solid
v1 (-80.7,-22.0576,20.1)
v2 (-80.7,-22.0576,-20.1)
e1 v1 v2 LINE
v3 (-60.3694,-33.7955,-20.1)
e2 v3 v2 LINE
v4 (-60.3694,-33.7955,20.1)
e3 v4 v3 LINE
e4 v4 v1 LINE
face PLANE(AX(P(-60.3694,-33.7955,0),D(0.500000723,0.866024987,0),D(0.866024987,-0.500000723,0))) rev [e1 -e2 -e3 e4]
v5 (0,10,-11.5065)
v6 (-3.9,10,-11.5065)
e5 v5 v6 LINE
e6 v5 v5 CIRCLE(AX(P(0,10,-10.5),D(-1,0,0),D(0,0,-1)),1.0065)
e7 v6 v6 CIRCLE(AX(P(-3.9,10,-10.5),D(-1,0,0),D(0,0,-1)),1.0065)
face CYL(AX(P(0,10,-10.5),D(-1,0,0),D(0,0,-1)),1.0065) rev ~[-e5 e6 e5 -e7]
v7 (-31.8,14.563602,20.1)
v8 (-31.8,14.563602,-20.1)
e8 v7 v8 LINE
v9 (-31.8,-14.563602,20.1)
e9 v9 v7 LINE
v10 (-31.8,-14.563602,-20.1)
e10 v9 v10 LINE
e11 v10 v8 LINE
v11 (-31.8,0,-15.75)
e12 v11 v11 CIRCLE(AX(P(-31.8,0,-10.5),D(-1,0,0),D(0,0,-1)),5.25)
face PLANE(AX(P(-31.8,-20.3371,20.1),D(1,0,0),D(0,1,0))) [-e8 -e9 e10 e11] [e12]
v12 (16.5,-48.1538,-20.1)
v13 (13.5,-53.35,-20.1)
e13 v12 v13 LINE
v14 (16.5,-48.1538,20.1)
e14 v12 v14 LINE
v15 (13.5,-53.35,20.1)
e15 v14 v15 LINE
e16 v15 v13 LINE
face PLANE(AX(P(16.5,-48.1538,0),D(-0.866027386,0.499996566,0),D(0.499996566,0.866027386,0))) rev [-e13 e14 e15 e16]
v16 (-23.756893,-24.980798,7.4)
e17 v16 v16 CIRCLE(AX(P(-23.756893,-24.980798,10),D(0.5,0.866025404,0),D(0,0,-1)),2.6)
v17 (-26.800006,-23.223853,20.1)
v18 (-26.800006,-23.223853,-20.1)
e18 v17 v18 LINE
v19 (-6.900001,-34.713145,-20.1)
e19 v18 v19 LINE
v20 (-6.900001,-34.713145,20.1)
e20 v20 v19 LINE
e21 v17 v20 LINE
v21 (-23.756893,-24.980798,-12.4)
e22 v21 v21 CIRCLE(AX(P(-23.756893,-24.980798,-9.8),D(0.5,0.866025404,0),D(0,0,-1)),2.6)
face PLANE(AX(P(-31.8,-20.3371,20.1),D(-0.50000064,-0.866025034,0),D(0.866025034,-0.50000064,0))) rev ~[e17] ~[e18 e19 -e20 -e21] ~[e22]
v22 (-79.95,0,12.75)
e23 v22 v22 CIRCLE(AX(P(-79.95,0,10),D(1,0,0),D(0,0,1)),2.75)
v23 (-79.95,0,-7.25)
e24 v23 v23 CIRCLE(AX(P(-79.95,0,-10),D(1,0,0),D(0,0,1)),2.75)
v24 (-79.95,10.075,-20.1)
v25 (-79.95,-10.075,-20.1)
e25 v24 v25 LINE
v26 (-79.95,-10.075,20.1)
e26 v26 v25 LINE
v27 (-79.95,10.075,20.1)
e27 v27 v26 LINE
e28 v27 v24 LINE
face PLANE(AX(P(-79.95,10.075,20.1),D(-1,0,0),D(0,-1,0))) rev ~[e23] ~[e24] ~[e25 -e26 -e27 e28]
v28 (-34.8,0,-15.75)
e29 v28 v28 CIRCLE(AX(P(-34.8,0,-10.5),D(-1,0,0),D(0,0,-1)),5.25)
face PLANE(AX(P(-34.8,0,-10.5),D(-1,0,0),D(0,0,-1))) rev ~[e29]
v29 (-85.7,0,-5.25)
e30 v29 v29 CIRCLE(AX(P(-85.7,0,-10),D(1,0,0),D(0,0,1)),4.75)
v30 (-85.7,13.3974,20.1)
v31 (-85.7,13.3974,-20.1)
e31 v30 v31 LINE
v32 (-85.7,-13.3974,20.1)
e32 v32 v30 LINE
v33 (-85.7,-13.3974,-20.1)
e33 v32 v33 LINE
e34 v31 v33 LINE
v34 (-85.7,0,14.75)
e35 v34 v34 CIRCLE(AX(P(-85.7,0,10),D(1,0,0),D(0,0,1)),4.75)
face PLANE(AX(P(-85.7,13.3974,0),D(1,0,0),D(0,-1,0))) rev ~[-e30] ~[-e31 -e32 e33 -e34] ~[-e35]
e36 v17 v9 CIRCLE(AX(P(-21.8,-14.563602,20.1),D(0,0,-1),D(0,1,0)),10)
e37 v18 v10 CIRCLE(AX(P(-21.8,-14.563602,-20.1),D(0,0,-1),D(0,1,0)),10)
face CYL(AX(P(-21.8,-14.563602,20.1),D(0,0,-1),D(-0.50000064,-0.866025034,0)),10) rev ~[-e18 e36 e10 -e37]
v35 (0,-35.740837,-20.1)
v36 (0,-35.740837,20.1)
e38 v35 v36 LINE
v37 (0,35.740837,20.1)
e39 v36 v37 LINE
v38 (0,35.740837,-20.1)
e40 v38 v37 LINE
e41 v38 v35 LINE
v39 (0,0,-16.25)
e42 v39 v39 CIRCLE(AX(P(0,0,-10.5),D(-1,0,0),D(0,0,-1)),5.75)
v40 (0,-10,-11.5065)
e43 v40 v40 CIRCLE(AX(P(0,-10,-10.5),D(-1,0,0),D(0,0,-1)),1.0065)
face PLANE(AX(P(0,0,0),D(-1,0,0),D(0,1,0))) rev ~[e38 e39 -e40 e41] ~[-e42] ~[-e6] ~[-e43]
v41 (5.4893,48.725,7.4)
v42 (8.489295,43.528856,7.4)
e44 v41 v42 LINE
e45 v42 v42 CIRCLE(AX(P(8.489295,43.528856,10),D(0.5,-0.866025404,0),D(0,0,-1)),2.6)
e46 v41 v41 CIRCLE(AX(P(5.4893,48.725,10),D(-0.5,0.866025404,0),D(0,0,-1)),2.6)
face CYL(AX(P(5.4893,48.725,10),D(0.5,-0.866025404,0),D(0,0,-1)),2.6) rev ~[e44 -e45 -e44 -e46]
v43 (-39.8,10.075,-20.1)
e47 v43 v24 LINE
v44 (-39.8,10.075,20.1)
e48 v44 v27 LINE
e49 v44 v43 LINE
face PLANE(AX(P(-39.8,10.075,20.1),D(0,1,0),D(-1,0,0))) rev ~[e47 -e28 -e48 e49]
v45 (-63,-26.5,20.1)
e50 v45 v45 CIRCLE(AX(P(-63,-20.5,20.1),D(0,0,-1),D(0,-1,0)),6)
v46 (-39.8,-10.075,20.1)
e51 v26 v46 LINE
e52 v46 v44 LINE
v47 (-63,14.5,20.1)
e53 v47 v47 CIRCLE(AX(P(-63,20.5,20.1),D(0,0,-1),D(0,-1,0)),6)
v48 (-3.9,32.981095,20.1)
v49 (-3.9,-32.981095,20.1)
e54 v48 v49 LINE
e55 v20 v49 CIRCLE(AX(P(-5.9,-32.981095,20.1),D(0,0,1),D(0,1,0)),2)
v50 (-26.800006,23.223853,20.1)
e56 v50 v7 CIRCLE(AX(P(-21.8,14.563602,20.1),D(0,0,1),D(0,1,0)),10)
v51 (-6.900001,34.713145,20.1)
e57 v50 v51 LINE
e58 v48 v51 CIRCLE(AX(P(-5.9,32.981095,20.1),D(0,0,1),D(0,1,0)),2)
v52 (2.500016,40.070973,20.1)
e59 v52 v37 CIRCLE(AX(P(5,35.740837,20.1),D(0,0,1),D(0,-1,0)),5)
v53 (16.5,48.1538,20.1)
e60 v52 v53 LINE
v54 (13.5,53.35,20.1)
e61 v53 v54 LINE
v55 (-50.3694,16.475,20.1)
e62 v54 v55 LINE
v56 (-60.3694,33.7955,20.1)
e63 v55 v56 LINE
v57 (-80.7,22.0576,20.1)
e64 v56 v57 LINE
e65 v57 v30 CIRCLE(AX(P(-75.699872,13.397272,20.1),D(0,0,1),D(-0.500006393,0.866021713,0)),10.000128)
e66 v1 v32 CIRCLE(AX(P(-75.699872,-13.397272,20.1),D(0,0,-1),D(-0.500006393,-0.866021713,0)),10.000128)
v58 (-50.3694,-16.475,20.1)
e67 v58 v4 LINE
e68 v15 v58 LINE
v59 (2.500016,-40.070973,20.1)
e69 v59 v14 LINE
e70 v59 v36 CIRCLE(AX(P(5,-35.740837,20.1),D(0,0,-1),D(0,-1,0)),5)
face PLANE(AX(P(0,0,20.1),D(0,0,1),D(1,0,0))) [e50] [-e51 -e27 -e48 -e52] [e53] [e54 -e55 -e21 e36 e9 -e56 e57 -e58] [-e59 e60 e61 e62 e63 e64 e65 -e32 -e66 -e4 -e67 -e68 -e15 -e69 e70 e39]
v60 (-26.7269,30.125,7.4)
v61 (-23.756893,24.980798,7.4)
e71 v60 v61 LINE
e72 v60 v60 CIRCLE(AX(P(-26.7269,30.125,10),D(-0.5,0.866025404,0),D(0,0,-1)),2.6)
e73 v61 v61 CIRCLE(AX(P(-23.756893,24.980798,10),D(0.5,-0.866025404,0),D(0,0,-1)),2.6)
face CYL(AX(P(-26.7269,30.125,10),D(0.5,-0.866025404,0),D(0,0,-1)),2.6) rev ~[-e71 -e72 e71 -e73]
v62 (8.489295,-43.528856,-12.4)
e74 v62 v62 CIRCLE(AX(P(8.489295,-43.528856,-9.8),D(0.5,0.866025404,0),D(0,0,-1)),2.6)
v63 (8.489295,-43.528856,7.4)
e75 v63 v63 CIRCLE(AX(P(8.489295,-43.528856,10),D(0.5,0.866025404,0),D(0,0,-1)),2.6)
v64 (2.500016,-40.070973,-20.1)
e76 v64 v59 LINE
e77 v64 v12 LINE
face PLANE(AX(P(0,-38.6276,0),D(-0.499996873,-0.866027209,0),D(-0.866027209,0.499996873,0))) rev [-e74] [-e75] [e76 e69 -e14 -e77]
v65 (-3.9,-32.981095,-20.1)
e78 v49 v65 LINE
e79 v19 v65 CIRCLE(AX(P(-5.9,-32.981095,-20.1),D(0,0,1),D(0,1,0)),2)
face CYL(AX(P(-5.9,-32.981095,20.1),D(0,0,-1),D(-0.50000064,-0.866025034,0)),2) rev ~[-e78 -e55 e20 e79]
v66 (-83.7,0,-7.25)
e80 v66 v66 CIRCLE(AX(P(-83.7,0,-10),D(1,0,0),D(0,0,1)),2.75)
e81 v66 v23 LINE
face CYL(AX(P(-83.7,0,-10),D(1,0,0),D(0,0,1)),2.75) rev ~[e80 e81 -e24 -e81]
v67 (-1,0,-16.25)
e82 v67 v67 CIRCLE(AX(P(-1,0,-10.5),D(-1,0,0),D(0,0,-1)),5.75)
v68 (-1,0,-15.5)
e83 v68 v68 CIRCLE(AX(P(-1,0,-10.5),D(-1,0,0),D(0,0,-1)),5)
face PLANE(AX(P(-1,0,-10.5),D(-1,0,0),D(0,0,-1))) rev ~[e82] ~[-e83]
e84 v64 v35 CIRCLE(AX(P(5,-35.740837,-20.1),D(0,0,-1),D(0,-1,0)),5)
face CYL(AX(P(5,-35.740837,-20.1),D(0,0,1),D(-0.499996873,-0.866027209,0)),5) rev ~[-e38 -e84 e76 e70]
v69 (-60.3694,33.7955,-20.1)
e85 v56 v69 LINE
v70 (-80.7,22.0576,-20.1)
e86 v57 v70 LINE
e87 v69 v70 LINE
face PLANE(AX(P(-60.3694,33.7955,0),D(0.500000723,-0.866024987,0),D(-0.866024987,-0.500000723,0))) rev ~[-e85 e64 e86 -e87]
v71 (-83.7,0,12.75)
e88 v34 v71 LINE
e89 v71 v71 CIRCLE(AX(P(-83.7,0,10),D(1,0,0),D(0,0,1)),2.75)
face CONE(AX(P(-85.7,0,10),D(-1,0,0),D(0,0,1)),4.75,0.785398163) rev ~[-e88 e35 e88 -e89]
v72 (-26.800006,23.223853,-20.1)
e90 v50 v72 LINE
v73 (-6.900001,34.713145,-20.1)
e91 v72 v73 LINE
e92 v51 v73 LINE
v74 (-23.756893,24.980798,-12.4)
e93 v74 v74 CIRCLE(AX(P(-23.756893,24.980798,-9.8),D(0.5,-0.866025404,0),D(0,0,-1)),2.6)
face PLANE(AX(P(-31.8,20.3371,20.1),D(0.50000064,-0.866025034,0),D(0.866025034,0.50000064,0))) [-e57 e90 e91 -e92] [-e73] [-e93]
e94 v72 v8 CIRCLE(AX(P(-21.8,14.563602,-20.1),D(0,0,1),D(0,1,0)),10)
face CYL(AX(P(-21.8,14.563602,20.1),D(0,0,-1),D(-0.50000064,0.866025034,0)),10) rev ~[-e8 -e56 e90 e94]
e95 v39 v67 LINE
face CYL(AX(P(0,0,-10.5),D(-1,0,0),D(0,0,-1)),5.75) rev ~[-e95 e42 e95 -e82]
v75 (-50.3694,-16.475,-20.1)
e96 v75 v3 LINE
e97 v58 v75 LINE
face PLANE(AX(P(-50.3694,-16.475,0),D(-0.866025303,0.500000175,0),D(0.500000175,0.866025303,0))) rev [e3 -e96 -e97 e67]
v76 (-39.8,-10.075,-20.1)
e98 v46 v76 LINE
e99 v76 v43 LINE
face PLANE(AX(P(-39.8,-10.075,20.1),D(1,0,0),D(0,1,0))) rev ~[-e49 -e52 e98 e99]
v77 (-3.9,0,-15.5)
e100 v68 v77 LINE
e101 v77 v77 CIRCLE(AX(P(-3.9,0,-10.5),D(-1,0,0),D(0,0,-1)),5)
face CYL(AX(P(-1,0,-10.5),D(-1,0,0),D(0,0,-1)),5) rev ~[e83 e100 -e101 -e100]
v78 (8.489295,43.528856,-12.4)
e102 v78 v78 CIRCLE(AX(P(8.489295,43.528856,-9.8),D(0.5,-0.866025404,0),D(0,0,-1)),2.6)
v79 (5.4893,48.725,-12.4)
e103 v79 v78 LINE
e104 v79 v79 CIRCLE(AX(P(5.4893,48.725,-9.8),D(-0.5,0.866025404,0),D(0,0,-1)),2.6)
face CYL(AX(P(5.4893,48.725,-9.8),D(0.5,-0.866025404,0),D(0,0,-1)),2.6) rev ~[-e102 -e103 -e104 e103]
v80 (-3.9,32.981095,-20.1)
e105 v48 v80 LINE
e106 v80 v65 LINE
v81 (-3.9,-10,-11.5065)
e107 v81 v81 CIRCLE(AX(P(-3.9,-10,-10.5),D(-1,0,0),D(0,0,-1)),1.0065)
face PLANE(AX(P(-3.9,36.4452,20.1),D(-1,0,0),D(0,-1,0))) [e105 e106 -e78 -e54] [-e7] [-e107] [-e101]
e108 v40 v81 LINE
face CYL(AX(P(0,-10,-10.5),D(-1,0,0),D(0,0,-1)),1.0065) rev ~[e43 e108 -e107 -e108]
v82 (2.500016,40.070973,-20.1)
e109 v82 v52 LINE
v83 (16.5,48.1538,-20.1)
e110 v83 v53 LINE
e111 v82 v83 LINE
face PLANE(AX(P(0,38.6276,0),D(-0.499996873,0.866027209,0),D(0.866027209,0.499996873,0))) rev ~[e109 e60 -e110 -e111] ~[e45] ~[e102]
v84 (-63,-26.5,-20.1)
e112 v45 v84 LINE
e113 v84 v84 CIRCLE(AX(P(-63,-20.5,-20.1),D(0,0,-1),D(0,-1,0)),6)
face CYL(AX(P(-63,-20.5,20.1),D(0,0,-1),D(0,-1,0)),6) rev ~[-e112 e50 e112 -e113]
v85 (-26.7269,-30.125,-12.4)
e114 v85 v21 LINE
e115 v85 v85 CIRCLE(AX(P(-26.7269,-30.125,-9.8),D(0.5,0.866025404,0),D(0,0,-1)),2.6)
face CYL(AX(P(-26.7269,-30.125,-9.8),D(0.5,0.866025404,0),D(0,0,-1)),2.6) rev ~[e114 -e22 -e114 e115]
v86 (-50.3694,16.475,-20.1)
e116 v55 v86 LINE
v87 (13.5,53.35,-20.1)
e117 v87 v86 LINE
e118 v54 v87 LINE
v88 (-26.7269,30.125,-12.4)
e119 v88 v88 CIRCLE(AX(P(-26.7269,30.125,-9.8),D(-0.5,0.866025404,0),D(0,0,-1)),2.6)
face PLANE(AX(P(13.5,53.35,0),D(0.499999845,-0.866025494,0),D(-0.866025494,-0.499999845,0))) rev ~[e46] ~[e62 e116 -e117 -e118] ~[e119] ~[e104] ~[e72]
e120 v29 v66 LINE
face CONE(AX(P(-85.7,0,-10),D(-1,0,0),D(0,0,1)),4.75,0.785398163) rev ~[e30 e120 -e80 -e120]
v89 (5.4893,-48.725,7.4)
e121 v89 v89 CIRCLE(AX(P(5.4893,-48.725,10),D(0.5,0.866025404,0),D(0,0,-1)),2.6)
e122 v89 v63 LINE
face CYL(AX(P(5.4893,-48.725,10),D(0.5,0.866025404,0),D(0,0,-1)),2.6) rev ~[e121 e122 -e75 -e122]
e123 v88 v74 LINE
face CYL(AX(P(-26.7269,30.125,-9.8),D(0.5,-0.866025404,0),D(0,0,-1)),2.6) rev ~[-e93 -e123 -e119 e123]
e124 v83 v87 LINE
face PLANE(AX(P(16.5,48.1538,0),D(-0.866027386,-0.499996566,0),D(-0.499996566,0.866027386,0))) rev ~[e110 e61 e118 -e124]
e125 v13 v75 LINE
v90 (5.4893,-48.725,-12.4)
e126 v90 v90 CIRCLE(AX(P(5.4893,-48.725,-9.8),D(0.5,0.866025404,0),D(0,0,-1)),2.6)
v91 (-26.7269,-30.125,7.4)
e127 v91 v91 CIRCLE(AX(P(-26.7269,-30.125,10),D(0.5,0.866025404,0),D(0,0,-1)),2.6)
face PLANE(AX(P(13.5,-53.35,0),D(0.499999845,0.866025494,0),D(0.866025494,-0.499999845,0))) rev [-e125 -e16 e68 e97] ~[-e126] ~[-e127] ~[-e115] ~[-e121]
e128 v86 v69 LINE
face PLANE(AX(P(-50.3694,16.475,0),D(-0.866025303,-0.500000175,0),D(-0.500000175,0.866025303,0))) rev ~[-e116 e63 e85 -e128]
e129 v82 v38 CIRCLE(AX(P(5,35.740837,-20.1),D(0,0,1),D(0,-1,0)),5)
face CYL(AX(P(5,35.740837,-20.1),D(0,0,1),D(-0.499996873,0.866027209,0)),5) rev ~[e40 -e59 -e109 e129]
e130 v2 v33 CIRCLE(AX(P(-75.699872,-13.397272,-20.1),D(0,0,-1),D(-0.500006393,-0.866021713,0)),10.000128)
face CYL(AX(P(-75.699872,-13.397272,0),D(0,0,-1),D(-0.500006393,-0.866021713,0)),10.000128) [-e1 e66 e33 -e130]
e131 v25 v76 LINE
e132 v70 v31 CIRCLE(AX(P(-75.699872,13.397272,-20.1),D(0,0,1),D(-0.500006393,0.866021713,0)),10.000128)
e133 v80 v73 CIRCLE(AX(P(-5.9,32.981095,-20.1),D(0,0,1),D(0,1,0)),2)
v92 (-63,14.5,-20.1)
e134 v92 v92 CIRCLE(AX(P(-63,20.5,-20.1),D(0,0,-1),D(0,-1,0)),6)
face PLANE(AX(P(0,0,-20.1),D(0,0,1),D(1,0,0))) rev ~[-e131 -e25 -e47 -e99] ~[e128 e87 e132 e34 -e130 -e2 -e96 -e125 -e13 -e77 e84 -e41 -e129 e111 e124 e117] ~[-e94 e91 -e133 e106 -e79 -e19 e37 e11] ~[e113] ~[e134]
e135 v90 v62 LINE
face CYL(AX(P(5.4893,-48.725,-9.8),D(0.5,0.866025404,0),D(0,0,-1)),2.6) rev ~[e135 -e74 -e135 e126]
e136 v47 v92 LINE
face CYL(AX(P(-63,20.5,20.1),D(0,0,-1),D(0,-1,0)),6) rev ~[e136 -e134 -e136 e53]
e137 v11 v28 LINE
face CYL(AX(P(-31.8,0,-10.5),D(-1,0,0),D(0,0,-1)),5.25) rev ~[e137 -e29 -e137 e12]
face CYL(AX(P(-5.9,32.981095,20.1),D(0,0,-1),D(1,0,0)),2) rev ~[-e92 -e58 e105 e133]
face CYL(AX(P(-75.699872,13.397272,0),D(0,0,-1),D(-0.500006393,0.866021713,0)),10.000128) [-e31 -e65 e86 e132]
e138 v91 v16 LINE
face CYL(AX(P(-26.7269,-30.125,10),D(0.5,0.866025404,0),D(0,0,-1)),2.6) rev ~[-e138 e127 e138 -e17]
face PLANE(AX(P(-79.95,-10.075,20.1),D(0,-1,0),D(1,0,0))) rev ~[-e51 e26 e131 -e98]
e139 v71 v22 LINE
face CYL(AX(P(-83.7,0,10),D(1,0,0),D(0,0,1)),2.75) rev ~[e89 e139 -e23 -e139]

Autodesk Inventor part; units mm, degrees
ref_plane "YZ Plane" through (0, 0, 0) normal (1, 0, 0) x (0, 1, 0)
ref_plane "XZ Plane" through (0, 0, 0) normal (0, 1, 0) x (-1, 0, 0)
ref_plane "XY Plane" through (0, 0, 0) normal (0, 0, 1) x (1, 0, 0)
sketch "Esquisse1" plane through (0, 0, 0) normal (0, 0, 1) x (1, 0, 0)
  line L0 (0, 0) -> (0, 38.6276)
  line L1 (0, 38.6276) -> (16.5, 48.1538)
  line L2 (16.5, 48.1538) -> (13.5, 53.35)
  line L3 (13.5, 53.35) -> (-50.3694, 16.475)
  line L4 (-50.3694, 16.475) -> (-60.3694, 33.7955)
  line L5 (-60.3694, 33.7955) -> (-80.7, 22.0576)
  line L6 (-85.7, 13.3974) -> (-85.7, 0)
  line L7 (-85.7, 0) -> (0, 0)
  arc A0 (-80.7, 22.0576) -> (-85.7, 13.3974) centre (-75.7, 13.3974) ccw
  line L8 (-79.9, 0) -> (-39.75, 0) construction
  line L9 (-39.75, 0) -> (-39.75, 10.075) construction
  line L10 (-39.75, 10.075) -> (-79.9, 10.075) construction
  line L11 (-79.9, 10.075) -> (-79.9, 0) construction
  dimension "d0" = 20
  dimension "d1" = 73.75
  dimension "d3" = 6
  dimension "d4" = 16.5
  dimension "d7" = 85.7
  dimension "d32" = 40.15
  dimension "d33" = 5.8
  dimension "d34" = 10.075
  dimension "d35" = 6.4
  dimension "d38" = 120
  dimension "d39" = 10
extrude "Embase" add sketch "Esquisse1" along normal mid plane 40.2
mirror "Symétrie1" about plane through (-85.7, 0, 0) normal (0, -1, 0) of "Embase"
sketch "Esquisse2" plane through (0, 0, 20.1) normal (0, 0, 1) x (1, 0, 0)
  line L0 (-79.95, -10.075) -> (-39.8, -10.075)
  line L1 (-39.8, -10.075) -> (-39.8, 10.075)
  line L2 (-39.8, 10.075) -> (-79.95, 10.075)
  line L3 (-79.95, 10.075) -> (-79.95, -10.075)
  line L4 (0, 38.6276) -> (0, -38.6276) projected
  line L5 (-85.7, 13.3974) -> (-85.7, -13.3974) projected
  point P0 (0, 0)
  point P1 (-39.8, 0)
  point P2 (0, 0)
  dimension "d14" = 20.15
  dimension "d15" = 40.15
  dimension "d16" = 5.75
extrude "Passage profilé vertical" cut sketch "Esquisse2" against normal through all
sketch "Esquisse3" plane through (0, 0, 20.1) normal (0, 0, 1) x (1, 0, 0)
  line L0 (-31.8, -20.3371) -> (-31.8, 20.3371)
  line L1 (-31.8, 20.3371) -> (-3.9, 36.4452)
  line L2 (-3.9, 36.4452) -> (-3.9, -36.4452)
  line L3 (-31.8, -20.3371) -> (-3.9, -36.4452)
  line L4 (0, 38.6276) -> (0, -38.6276) projected
  line L5 (13.5, 53.35) -> (-50.3694, 16.475) projected
  line L6 (13.5, -53.35) -> (-50.3694, -16.475) projected
  point P0 (0, 0)
  dimension "d19" = 27.9
  dimension "d20" = 3.9
  dimension "d21" = 5.94
  dimension "d22" = 5.94
extrude "Passage courroie" cut sketch "Esquisse3" against normal through all
fillet "Congé1" radius 10 2 edges at (-31.8, -20.3371, 0) (-31.8, 20.3371, 0)
fillet "Congé1" radius 2 2 edges at (-3.9, -36.4452, 0) (-3.9, 36.4452, 0)
fillet "Congé1" radius 5 2 edges at (0, -38.6276, 0) (0, 38.6276, 0)
sketch "Esquisse7" plane through (0, 0, 20.1) normal (0, 0, 1) x (1, 0, 0)
  point P0 (0, 0)
  point P1 (-63, -20.5)
  point P2 (-63, 20.5)
  dimension "d51" = 20.5
  dimension "d52" = 63
  dimension "d53" = 20.5
  dimension "d54" = 63
hole "Passage axe" at (-63, -20.5, 20.1) at (-63, 20.5, 20.1) direction (0, 0, -1) diameter 12 end through all
sketch "Esquisse8" plane through (-85.7, 13.3974, -20.1) normal (-1, 0, 0) x (0, 0, 1)
  point P0 (20.1, -13.3974)
  point P1 (10.1, -13.3974)
  point P2 (30.1, -13.3974)
  dimension "d55" = 20
  dimension "d56" = 10
hole "Maintient profilé vertical" at (-85.7, 0, -10) at (-85.7, 0, 10) direction (1, 0, 0) diameter 5.5 end up to surface countersink diameter 9.5 countersink angle 90
sketch "Esquisse9" plane through (-50.3694, -16.475, -20.1) normal (-0.5, -0.8660254, 0) x (0.8660254, -0.5, 0)
  line L0 (0, 0) -> (73.75, 0) projected
  line L1 (73.75, 40.2) -> (0, 40.2) projected
  line L2 (73.75, 40.2) -> (73.75, 0) projected
  point P0 (35.3837, 20.1)
  point P1 (27.3, 30.1)
  point P2 (27.3, 10.3)
  point P3 (64.5, 30.1)
  point P4 (64.5, 10.3)
  dimension "d64" = 37.2
  dimension "d66" = 10.3
  dimension "d67" = 10.1
  dimension "d68" = 9.25
hole "Maintient profilé horizonal" at (-26.7269, -30.125, 10) at (-26.7269, -30.125, -9.8) at (5.4893, -48.725, 10) at (5.4893, -48.725, -9.8) direction (0.5, 0.8660254, 0) diameter 5.2 depth 8 tip angle 118
mirror "Symétrie2" about plane through (0, 0, 0) normal (0, 1, 0) of "Maintient profilé horizonal"
sketch "Esquisse10" plane through (0, -35.7408, 20.1) normal (1, 0, 0) x (0, 0, -1)
  line L0 (40.2, 71.4816) -> (40.2, 0) projected
  point P0 (20.1, 35.7408)
  point P1 (30.6, 35.7408)
  dimension "d76" = 9.6
hole "Perçage roulement a bille" at (0, 0, -10.5) direction (-1, 0, 0) diameter 10 depth 10 tip angle 118 counterbore diameter 11.5 counterbore depth 1
sketch "Esquisse11" plane through (0, -35.7408, 20.1) normal (1, 0, 0) x (0, 0, -1)
  circle A0 centre (30.6, 35.7408) radius 5 construction
  point P0 (20.1, 35.7408)
  point P1 (30.6, 25.7408)
  point P2 (30.6, 45.7408)
  dimension "d84" = 20
  dimension "d85" = 10
hole "Taraudage plaque de maintient" at (0, -10, -10.5) at (0, 10, -10.5) direction (-1, 0, 0) diameter 2.013 depth 7.6 tip angle 118 thread size "M2.5x0.45" class "6H" standard "ISO Metric profile"
sketch "Esquisse12" plane through (-31.8, -14.5636, 20.1) normal (1, 0, 0) x (0, 0, -1)
  circle A0 centre (30.6, 14.5636) radius 5 construction
  point P0 (20.1, 14.5636)
hole "Perçage roulement a bille intérieur" at (-31.8, 0, -10.5) direction (-1, 0, 0) diameter 10.5 depth 3
equation "\"d22\" = d21"
equation "\"d53\" = d51"
equation "\"d54\" = d52"
equation "\"d56\" = 0.5 * d55"
equation "\"d85\" = 0.5 * d84"
properties part number "Coins superieur" material "Aluminium"
